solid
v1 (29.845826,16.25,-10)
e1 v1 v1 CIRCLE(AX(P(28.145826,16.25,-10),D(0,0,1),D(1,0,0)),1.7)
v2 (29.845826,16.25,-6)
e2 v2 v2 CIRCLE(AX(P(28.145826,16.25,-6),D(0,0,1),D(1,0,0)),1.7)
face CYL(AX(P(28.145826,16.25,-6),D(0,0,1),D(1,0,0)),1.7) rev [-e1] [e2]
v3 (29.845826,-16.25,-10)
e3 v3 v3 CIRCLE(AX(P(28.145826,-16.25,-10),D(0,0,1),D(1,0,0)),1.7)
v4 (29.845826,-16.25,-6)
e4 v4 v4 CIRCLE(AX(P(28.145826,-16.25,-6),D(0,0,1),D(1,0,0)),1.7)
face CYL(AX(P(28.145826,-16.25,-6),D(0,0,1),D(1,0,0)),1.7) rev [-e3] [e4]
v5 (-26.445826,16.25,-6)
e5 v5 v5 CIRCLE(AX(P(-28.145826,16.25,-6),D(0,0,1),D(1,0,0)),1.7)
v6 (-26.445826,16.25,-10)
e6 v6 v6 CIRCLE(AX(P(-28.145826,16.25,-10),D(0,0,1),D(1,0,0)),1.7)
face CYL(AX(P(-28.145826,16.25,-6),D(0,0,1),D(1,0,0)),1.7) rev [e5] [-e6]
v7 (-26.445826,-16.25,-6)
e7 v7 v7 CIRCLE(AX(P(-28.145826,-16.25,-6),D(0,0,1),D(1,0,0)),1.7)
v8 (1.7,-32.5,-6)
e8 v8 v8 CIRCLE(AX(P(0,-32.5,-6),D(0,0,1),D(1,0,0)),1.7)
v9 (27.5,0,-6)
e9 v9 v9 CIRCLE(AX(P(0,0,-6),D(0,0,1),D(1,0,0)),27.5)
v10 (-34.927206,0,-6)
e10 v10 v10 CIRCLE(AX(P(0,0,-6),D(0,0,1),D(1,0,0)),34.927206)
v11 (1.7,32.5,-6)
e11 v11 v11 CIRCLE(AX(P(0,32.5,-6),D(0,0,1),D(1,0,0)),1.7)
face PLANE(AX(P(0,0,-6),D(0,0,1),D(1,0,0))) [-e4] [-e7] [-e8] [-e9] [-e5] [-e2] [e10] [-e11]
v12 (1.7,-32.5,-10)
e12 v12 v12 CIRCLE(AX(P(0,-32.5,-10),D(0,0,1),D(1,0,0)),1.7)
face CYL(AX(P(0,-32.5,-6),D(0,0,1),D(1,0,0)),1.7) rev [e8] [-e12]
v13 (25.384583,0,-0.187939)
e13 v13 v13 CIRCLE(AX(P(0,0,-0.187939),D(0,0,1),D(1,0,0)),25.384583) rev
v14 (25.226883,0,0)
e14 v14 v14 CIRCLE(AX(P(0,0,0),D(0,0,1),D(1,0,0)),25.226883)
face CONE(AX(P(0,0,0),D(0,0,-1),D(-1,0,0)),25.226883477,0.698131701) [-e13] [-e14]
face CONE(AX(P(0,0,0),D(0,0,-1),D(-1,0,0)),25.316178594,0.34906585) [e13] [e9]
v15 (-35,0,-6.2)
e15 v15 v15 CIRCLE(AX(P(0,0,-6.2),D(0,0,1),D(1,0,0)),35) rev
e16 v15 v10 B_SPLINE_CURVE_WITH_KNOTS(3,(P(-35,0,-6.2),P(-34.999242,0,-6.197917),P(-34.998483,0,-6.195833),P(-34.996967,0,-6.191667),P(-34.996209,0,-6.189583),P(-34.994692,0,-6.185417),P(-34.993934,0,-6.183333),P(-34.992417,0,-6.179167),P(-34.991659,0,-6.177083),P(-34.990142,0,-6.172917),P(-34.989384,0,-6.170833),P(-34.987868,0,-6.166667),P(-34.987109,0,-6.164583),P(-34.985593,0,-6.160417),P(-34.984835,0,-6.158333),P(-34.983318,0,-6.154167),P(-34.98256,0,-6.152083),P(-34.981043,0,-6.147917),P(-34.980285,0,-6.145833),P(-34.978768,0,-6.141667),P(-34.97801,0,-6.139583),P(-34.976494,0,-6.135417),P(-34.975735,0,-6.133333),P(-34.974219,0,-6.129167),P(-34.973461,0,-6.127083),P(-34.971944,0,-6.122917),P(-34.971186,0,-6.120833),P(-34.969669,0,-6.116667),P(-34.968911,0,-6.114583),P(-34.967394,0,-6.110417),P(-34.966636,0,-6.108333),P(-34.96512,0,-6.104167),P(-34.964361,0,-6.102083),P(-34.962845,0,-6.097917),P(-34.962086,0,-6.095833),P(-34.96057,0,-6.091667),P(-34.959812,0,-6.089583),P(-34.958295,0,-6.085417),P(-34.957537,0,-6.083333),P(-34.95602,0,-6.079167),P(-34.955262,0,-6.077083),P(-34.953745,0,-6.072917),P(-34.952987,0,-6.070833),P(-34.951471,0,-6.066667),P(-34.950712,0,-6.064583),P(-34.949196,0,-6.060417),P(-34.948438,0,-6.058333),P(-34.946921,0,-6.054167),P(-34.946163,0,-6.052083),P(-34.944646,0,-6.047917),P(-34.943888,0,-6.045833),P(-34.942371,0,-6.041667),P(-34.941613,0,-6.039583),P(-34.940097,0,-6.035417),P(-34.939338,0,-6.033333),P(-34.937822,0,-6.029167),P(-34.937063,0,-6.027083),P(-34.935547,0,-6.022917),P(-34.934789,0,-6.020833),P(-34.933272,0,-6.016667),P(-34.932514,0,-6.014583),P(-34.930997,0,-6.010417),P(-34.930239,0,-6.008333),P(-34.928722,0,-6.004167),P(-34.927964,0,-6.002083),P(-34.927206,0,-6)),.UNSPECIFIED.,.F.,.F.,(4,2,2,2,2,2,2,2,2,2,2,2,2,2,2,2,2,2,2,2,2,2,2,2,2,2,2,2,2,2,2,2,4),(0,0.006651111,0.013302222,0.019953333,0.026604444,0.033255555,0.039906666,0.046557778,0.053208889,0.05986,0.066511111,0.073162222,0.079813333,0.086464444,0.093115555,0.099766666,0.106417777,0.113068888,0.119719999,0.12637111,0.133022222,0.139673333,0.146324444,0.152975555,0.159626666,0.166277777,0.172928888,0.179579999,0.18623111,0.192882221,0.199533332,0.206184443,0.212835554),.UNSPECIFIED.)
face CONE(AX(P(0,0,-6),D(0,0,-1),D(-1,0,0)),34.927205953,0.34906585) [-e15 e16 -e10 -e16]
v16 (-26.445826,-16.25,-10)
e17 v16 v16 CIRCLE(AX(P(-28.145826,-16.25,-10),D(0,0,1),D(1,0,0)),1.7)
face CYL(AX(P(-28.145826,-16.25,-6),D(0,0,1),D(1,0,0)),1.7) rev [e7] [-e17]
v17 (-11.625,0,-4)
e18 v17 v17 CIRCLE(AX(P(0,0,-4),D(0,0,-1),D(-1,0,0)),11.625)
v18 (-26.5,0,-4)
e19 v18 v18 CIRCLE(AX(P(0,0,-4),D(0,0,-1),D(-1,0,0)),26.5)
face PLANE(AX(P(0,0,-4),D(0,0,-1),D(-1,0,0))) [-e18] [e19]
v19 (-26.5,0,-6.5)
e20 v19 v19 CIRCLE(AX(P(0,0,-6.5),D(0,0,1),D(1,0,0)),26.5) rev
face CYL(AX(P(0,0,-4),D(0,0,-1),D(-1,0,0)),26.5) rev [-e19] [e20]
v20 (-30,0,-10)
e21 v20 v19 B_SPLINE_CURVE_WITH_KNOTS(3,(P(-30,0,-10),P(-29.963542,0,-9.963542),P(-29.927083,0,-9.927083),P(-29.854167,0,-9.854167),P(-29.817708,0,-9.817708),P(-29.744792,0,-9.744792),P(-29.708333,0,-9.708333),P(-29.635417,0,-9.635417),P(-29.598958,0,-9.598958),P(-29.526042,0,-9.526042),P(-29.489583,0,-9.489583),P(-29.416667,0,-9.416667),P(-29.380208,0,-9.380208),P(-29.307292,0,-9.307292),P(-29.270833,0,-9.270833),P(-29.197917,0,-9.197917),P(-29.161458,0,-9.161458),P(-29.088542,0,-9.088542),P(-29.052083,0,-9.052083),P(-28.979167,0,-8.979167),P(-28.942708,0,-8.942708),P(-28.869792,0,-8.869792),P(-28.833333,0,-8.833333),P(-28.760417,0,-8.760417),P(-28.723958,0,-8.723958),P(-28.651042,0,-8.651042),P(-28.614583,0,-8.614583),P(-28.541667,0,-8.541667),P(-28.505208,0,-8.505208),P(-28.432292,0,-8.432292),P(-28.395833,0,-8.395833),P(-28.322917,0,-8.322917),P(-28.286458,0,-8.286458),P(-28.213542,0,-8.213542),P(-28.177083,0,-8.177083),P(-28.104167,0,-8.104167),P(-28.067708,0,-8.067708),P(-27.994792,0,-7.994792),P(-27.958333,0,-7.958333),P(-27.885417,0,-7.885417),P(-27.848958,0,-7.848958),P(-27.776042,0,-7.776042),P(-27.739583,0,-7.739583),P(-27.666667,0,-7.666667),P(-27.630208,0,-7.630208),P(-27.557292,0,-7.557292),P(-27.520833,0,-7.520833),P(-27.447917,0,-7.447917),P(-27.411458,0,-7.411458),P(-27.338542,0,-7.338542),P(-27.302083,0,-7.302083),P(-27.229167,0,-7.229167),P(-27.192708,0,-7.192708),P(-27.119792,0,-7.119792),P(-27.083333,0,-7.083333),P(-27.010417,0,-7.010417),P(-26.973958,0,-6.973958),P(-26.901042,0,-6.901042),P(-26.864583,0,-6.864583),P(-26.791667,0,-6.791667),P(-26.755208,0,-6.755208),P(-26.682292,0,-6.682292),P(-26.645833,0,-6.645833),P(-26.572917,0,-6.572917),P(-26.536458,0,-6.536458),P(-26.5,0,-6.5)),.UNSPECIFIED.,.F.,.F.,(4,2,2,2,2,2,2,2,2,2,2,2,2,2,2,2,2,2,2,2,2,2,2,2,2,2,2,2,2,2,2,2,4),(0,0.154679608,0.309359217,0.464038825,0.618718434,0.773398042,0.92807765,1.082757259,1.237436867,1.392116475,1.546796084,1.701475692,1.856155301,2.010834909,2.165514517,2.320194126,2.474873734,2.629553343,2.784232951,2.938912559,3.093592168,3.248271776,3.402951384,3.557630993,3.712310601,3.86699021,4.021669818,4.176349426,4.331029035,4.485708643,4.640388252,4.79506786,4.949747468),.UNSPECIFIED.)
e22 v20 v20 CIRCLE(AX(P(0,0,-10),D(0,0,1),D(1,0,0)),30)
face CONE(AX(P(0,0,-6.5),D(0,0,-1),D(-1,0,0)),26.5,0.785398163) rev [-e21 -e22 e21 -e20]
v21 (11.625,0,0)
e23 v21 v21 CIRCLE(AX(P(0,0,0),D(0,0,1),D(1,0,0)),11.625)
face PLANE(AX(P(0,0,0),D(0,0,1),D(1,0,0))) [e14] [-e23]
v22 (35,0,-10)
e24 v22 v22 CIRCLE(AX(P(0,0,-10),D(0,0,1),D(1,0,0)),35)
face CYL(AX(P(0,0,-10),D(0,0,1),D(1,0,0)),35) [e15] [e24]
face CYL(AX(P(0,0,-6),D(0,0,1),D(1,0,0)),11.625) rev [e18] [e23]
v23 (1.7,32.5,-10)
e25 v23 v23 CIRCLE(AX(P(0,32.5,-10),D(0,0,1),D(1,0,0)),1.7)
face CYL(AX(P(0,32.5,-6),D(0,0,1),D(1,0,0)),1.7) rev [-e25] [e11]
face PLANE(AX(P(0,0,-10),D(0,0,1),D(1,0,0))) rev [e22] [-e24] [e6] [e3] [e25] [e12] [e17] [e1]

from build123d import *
from OCP.BRepFilletAPI import BRepFilletAPI_MakeChamfer

# Parameters (mm, degrees)
SKETCH1_R            = 35
BOSS_EXTRUDE1_DEPTH  = 10
SKETCH2_R            = 26.5
CUT_EXTRUDE1_DEPTH   = 6
CHAMFER1_SIZE        = 3.5
SKETCH5_R            = 35
SKETCH5_R_2          = 27.5
CUT_EXTRUDE3_DEPTH   = 6
CHAMFER3_SIZE        = 6
CHAMFER3_SIZE_2      = 2.183821406
SKETCH6_R            = 11.625
CUT_EXTRUDE4_DEPTH   = 6
M3_CLEARANCE_HOLE1_D = 3.4
CIRPATTERN1_COUNT    = 6
CHAMFER4_SIZE        = 0.2
CHAMFER4_SIZE2       = 0.072794047
CHAMFER4_SIZE2_2     = 0.089295118


with BuildPart() as part:
    # Sketch1 → Boss-Extrude1 (new body)
    with BuildSketch(Plane.XY):
        Circle(SKETCH1_R)
    extrude(amount=-BOSS_EXTRUDE1_DEPTH)

    # Sketch2 → Cut-Extrude1 (cut)
    with BuildSketch(Plane(origin=(0, 0, -10), x_dir=(-1, 0, 0), z_dir=(0, 0, -1))):
        Circle(SKETCH2_R)
    extrude(amount=-CUT_EXTRUDE1_DEPTH, mode=Mode.SUBTRACT)

    # Chamfer1
    chamfer1_edges = [part.edges().sort_by_distance(p)[0] for p in [
        (26.5, 0, -10),
    ]]
    chamfer(chamfer1_edges, length=CHAMFER1_SIZE)

    # Sketch5 → Cut-Extrude3 (cut)
    with BuildSketch(Plane.XY):
        Circle(SKETCH5_R)
        Circle(SKETCH5_R_2, mode=Mode.SUBTRACT)
    extrude(amount=-CUT_EXTRUDE3_DEPTH, mode=Mode.SUBTRACT)

    # Chamfer3
    # the kernel refuses this chamfer: 6, 2.183821406 mm, written as the material it takes off along each edge
    with BuildSketch(Plane(origin=(0, 0, 0), x_dir=(1, 0, 0), z_dir=(0, -1, 0))) as chamfer3_piece_1_section:
        Polygon((27.5, -CHAMFER3_SIZE), (27.5 - CHAMFER3_SIZE_2, 0), (27.5, 0), align=None)
    chamfer3_piece_1 = revolve(axis=Axis((0, 0, 0), (0, 0, 1)), mode=Mode.PRIVATE)
    chamfer3_piece_1 = split(chamfer3_piece_1, bisect_by=Plane(origin=(-26.469518779, 0, -6), z_dir=(0, 0, 1)), keep=Keep.TOP, mode=Mode.PRIVATE)
    add(chamfer3_piece_1, mode=Mode.SUBTRACT)

    # Sketch6 → Cut-Extrude4 (cut)
    with BuildSketch(Plane.XY):
        Circle(SKETCH6_R)
    extrude(amount=-CUT_EXTRUDE4_DEPTH, mode=Mode.SUBTRACT)

    # M3 Clearance Hole1 (through all)
    with Locations(Plane(origin=(0, 32.5, -6), x_dir=(1, 0, 0), z_dir=(0, 0, 1))):
        with Locations((0, 0)):
            m3_clearance_hole1 = Hole(M3_CLEARANCE_HOLE1_D / 2)

    # CirPattern1: M3 Clearance Hole1 ×6 about axis
    cirpattern1_axis = Axis((0, 0, 0), (0, 0, 1))
    for i in range(1, CIRPATTERN1_COUNT):
        add(m3_clearance_hole1.rotate(cirpattern1_axis, i * 360 / CIRPATTERN1_COUNT), mode=Mode.SUBTRACT)

    # Chamfer4: one chamfer whose edges measure the first distance from different faces: ONE call of the kernel's chamfer builder (chamfer() names one face for all edges)
    chamfer4_edges_1 = [part.edges().sort_by_distance(p)[0] for p in [
        (-35, 0, -6),
    ]]
    chamfer4_side_1 = [part.faces().sort_by_distance(p)[0] for p in [
        (-35, 0, -8),
    ]]
    chamfer4_edges_2 = [part.edges().sort_by_distance(p)[0] for p in [
        (-25.316178594, 0, 0),
    ]]
    chamfer4_side_2 = [part.faces().sort_by_distance(p)[0] for p in [
        (-26.408089297, 0, -3),
    ]]
    chamfer4 = BRepFilletAPI_MakeChamfer(part.part.solid().wrapped)
    for e in chamfer4_edges_1:
        chamfer4.Add(CHAMFER4_SIZE, CHAMFER4_SIZE2, e.wrapped, chamfer4_side_1[0].wrapped)  # the first distance lies on this face
    for e in chamfer4_edges_2:
        chamfer4.Add(CHAMFER4_SIZE, CHAMFER4_SIZE2_2, e.wrapped, chamfer4_side_2[0].wrapped)  # the first distance lies on this face
    add(Compound.cast(chamfer4.Shape()), mode=Mode.REPLACE)


solid = part.part
